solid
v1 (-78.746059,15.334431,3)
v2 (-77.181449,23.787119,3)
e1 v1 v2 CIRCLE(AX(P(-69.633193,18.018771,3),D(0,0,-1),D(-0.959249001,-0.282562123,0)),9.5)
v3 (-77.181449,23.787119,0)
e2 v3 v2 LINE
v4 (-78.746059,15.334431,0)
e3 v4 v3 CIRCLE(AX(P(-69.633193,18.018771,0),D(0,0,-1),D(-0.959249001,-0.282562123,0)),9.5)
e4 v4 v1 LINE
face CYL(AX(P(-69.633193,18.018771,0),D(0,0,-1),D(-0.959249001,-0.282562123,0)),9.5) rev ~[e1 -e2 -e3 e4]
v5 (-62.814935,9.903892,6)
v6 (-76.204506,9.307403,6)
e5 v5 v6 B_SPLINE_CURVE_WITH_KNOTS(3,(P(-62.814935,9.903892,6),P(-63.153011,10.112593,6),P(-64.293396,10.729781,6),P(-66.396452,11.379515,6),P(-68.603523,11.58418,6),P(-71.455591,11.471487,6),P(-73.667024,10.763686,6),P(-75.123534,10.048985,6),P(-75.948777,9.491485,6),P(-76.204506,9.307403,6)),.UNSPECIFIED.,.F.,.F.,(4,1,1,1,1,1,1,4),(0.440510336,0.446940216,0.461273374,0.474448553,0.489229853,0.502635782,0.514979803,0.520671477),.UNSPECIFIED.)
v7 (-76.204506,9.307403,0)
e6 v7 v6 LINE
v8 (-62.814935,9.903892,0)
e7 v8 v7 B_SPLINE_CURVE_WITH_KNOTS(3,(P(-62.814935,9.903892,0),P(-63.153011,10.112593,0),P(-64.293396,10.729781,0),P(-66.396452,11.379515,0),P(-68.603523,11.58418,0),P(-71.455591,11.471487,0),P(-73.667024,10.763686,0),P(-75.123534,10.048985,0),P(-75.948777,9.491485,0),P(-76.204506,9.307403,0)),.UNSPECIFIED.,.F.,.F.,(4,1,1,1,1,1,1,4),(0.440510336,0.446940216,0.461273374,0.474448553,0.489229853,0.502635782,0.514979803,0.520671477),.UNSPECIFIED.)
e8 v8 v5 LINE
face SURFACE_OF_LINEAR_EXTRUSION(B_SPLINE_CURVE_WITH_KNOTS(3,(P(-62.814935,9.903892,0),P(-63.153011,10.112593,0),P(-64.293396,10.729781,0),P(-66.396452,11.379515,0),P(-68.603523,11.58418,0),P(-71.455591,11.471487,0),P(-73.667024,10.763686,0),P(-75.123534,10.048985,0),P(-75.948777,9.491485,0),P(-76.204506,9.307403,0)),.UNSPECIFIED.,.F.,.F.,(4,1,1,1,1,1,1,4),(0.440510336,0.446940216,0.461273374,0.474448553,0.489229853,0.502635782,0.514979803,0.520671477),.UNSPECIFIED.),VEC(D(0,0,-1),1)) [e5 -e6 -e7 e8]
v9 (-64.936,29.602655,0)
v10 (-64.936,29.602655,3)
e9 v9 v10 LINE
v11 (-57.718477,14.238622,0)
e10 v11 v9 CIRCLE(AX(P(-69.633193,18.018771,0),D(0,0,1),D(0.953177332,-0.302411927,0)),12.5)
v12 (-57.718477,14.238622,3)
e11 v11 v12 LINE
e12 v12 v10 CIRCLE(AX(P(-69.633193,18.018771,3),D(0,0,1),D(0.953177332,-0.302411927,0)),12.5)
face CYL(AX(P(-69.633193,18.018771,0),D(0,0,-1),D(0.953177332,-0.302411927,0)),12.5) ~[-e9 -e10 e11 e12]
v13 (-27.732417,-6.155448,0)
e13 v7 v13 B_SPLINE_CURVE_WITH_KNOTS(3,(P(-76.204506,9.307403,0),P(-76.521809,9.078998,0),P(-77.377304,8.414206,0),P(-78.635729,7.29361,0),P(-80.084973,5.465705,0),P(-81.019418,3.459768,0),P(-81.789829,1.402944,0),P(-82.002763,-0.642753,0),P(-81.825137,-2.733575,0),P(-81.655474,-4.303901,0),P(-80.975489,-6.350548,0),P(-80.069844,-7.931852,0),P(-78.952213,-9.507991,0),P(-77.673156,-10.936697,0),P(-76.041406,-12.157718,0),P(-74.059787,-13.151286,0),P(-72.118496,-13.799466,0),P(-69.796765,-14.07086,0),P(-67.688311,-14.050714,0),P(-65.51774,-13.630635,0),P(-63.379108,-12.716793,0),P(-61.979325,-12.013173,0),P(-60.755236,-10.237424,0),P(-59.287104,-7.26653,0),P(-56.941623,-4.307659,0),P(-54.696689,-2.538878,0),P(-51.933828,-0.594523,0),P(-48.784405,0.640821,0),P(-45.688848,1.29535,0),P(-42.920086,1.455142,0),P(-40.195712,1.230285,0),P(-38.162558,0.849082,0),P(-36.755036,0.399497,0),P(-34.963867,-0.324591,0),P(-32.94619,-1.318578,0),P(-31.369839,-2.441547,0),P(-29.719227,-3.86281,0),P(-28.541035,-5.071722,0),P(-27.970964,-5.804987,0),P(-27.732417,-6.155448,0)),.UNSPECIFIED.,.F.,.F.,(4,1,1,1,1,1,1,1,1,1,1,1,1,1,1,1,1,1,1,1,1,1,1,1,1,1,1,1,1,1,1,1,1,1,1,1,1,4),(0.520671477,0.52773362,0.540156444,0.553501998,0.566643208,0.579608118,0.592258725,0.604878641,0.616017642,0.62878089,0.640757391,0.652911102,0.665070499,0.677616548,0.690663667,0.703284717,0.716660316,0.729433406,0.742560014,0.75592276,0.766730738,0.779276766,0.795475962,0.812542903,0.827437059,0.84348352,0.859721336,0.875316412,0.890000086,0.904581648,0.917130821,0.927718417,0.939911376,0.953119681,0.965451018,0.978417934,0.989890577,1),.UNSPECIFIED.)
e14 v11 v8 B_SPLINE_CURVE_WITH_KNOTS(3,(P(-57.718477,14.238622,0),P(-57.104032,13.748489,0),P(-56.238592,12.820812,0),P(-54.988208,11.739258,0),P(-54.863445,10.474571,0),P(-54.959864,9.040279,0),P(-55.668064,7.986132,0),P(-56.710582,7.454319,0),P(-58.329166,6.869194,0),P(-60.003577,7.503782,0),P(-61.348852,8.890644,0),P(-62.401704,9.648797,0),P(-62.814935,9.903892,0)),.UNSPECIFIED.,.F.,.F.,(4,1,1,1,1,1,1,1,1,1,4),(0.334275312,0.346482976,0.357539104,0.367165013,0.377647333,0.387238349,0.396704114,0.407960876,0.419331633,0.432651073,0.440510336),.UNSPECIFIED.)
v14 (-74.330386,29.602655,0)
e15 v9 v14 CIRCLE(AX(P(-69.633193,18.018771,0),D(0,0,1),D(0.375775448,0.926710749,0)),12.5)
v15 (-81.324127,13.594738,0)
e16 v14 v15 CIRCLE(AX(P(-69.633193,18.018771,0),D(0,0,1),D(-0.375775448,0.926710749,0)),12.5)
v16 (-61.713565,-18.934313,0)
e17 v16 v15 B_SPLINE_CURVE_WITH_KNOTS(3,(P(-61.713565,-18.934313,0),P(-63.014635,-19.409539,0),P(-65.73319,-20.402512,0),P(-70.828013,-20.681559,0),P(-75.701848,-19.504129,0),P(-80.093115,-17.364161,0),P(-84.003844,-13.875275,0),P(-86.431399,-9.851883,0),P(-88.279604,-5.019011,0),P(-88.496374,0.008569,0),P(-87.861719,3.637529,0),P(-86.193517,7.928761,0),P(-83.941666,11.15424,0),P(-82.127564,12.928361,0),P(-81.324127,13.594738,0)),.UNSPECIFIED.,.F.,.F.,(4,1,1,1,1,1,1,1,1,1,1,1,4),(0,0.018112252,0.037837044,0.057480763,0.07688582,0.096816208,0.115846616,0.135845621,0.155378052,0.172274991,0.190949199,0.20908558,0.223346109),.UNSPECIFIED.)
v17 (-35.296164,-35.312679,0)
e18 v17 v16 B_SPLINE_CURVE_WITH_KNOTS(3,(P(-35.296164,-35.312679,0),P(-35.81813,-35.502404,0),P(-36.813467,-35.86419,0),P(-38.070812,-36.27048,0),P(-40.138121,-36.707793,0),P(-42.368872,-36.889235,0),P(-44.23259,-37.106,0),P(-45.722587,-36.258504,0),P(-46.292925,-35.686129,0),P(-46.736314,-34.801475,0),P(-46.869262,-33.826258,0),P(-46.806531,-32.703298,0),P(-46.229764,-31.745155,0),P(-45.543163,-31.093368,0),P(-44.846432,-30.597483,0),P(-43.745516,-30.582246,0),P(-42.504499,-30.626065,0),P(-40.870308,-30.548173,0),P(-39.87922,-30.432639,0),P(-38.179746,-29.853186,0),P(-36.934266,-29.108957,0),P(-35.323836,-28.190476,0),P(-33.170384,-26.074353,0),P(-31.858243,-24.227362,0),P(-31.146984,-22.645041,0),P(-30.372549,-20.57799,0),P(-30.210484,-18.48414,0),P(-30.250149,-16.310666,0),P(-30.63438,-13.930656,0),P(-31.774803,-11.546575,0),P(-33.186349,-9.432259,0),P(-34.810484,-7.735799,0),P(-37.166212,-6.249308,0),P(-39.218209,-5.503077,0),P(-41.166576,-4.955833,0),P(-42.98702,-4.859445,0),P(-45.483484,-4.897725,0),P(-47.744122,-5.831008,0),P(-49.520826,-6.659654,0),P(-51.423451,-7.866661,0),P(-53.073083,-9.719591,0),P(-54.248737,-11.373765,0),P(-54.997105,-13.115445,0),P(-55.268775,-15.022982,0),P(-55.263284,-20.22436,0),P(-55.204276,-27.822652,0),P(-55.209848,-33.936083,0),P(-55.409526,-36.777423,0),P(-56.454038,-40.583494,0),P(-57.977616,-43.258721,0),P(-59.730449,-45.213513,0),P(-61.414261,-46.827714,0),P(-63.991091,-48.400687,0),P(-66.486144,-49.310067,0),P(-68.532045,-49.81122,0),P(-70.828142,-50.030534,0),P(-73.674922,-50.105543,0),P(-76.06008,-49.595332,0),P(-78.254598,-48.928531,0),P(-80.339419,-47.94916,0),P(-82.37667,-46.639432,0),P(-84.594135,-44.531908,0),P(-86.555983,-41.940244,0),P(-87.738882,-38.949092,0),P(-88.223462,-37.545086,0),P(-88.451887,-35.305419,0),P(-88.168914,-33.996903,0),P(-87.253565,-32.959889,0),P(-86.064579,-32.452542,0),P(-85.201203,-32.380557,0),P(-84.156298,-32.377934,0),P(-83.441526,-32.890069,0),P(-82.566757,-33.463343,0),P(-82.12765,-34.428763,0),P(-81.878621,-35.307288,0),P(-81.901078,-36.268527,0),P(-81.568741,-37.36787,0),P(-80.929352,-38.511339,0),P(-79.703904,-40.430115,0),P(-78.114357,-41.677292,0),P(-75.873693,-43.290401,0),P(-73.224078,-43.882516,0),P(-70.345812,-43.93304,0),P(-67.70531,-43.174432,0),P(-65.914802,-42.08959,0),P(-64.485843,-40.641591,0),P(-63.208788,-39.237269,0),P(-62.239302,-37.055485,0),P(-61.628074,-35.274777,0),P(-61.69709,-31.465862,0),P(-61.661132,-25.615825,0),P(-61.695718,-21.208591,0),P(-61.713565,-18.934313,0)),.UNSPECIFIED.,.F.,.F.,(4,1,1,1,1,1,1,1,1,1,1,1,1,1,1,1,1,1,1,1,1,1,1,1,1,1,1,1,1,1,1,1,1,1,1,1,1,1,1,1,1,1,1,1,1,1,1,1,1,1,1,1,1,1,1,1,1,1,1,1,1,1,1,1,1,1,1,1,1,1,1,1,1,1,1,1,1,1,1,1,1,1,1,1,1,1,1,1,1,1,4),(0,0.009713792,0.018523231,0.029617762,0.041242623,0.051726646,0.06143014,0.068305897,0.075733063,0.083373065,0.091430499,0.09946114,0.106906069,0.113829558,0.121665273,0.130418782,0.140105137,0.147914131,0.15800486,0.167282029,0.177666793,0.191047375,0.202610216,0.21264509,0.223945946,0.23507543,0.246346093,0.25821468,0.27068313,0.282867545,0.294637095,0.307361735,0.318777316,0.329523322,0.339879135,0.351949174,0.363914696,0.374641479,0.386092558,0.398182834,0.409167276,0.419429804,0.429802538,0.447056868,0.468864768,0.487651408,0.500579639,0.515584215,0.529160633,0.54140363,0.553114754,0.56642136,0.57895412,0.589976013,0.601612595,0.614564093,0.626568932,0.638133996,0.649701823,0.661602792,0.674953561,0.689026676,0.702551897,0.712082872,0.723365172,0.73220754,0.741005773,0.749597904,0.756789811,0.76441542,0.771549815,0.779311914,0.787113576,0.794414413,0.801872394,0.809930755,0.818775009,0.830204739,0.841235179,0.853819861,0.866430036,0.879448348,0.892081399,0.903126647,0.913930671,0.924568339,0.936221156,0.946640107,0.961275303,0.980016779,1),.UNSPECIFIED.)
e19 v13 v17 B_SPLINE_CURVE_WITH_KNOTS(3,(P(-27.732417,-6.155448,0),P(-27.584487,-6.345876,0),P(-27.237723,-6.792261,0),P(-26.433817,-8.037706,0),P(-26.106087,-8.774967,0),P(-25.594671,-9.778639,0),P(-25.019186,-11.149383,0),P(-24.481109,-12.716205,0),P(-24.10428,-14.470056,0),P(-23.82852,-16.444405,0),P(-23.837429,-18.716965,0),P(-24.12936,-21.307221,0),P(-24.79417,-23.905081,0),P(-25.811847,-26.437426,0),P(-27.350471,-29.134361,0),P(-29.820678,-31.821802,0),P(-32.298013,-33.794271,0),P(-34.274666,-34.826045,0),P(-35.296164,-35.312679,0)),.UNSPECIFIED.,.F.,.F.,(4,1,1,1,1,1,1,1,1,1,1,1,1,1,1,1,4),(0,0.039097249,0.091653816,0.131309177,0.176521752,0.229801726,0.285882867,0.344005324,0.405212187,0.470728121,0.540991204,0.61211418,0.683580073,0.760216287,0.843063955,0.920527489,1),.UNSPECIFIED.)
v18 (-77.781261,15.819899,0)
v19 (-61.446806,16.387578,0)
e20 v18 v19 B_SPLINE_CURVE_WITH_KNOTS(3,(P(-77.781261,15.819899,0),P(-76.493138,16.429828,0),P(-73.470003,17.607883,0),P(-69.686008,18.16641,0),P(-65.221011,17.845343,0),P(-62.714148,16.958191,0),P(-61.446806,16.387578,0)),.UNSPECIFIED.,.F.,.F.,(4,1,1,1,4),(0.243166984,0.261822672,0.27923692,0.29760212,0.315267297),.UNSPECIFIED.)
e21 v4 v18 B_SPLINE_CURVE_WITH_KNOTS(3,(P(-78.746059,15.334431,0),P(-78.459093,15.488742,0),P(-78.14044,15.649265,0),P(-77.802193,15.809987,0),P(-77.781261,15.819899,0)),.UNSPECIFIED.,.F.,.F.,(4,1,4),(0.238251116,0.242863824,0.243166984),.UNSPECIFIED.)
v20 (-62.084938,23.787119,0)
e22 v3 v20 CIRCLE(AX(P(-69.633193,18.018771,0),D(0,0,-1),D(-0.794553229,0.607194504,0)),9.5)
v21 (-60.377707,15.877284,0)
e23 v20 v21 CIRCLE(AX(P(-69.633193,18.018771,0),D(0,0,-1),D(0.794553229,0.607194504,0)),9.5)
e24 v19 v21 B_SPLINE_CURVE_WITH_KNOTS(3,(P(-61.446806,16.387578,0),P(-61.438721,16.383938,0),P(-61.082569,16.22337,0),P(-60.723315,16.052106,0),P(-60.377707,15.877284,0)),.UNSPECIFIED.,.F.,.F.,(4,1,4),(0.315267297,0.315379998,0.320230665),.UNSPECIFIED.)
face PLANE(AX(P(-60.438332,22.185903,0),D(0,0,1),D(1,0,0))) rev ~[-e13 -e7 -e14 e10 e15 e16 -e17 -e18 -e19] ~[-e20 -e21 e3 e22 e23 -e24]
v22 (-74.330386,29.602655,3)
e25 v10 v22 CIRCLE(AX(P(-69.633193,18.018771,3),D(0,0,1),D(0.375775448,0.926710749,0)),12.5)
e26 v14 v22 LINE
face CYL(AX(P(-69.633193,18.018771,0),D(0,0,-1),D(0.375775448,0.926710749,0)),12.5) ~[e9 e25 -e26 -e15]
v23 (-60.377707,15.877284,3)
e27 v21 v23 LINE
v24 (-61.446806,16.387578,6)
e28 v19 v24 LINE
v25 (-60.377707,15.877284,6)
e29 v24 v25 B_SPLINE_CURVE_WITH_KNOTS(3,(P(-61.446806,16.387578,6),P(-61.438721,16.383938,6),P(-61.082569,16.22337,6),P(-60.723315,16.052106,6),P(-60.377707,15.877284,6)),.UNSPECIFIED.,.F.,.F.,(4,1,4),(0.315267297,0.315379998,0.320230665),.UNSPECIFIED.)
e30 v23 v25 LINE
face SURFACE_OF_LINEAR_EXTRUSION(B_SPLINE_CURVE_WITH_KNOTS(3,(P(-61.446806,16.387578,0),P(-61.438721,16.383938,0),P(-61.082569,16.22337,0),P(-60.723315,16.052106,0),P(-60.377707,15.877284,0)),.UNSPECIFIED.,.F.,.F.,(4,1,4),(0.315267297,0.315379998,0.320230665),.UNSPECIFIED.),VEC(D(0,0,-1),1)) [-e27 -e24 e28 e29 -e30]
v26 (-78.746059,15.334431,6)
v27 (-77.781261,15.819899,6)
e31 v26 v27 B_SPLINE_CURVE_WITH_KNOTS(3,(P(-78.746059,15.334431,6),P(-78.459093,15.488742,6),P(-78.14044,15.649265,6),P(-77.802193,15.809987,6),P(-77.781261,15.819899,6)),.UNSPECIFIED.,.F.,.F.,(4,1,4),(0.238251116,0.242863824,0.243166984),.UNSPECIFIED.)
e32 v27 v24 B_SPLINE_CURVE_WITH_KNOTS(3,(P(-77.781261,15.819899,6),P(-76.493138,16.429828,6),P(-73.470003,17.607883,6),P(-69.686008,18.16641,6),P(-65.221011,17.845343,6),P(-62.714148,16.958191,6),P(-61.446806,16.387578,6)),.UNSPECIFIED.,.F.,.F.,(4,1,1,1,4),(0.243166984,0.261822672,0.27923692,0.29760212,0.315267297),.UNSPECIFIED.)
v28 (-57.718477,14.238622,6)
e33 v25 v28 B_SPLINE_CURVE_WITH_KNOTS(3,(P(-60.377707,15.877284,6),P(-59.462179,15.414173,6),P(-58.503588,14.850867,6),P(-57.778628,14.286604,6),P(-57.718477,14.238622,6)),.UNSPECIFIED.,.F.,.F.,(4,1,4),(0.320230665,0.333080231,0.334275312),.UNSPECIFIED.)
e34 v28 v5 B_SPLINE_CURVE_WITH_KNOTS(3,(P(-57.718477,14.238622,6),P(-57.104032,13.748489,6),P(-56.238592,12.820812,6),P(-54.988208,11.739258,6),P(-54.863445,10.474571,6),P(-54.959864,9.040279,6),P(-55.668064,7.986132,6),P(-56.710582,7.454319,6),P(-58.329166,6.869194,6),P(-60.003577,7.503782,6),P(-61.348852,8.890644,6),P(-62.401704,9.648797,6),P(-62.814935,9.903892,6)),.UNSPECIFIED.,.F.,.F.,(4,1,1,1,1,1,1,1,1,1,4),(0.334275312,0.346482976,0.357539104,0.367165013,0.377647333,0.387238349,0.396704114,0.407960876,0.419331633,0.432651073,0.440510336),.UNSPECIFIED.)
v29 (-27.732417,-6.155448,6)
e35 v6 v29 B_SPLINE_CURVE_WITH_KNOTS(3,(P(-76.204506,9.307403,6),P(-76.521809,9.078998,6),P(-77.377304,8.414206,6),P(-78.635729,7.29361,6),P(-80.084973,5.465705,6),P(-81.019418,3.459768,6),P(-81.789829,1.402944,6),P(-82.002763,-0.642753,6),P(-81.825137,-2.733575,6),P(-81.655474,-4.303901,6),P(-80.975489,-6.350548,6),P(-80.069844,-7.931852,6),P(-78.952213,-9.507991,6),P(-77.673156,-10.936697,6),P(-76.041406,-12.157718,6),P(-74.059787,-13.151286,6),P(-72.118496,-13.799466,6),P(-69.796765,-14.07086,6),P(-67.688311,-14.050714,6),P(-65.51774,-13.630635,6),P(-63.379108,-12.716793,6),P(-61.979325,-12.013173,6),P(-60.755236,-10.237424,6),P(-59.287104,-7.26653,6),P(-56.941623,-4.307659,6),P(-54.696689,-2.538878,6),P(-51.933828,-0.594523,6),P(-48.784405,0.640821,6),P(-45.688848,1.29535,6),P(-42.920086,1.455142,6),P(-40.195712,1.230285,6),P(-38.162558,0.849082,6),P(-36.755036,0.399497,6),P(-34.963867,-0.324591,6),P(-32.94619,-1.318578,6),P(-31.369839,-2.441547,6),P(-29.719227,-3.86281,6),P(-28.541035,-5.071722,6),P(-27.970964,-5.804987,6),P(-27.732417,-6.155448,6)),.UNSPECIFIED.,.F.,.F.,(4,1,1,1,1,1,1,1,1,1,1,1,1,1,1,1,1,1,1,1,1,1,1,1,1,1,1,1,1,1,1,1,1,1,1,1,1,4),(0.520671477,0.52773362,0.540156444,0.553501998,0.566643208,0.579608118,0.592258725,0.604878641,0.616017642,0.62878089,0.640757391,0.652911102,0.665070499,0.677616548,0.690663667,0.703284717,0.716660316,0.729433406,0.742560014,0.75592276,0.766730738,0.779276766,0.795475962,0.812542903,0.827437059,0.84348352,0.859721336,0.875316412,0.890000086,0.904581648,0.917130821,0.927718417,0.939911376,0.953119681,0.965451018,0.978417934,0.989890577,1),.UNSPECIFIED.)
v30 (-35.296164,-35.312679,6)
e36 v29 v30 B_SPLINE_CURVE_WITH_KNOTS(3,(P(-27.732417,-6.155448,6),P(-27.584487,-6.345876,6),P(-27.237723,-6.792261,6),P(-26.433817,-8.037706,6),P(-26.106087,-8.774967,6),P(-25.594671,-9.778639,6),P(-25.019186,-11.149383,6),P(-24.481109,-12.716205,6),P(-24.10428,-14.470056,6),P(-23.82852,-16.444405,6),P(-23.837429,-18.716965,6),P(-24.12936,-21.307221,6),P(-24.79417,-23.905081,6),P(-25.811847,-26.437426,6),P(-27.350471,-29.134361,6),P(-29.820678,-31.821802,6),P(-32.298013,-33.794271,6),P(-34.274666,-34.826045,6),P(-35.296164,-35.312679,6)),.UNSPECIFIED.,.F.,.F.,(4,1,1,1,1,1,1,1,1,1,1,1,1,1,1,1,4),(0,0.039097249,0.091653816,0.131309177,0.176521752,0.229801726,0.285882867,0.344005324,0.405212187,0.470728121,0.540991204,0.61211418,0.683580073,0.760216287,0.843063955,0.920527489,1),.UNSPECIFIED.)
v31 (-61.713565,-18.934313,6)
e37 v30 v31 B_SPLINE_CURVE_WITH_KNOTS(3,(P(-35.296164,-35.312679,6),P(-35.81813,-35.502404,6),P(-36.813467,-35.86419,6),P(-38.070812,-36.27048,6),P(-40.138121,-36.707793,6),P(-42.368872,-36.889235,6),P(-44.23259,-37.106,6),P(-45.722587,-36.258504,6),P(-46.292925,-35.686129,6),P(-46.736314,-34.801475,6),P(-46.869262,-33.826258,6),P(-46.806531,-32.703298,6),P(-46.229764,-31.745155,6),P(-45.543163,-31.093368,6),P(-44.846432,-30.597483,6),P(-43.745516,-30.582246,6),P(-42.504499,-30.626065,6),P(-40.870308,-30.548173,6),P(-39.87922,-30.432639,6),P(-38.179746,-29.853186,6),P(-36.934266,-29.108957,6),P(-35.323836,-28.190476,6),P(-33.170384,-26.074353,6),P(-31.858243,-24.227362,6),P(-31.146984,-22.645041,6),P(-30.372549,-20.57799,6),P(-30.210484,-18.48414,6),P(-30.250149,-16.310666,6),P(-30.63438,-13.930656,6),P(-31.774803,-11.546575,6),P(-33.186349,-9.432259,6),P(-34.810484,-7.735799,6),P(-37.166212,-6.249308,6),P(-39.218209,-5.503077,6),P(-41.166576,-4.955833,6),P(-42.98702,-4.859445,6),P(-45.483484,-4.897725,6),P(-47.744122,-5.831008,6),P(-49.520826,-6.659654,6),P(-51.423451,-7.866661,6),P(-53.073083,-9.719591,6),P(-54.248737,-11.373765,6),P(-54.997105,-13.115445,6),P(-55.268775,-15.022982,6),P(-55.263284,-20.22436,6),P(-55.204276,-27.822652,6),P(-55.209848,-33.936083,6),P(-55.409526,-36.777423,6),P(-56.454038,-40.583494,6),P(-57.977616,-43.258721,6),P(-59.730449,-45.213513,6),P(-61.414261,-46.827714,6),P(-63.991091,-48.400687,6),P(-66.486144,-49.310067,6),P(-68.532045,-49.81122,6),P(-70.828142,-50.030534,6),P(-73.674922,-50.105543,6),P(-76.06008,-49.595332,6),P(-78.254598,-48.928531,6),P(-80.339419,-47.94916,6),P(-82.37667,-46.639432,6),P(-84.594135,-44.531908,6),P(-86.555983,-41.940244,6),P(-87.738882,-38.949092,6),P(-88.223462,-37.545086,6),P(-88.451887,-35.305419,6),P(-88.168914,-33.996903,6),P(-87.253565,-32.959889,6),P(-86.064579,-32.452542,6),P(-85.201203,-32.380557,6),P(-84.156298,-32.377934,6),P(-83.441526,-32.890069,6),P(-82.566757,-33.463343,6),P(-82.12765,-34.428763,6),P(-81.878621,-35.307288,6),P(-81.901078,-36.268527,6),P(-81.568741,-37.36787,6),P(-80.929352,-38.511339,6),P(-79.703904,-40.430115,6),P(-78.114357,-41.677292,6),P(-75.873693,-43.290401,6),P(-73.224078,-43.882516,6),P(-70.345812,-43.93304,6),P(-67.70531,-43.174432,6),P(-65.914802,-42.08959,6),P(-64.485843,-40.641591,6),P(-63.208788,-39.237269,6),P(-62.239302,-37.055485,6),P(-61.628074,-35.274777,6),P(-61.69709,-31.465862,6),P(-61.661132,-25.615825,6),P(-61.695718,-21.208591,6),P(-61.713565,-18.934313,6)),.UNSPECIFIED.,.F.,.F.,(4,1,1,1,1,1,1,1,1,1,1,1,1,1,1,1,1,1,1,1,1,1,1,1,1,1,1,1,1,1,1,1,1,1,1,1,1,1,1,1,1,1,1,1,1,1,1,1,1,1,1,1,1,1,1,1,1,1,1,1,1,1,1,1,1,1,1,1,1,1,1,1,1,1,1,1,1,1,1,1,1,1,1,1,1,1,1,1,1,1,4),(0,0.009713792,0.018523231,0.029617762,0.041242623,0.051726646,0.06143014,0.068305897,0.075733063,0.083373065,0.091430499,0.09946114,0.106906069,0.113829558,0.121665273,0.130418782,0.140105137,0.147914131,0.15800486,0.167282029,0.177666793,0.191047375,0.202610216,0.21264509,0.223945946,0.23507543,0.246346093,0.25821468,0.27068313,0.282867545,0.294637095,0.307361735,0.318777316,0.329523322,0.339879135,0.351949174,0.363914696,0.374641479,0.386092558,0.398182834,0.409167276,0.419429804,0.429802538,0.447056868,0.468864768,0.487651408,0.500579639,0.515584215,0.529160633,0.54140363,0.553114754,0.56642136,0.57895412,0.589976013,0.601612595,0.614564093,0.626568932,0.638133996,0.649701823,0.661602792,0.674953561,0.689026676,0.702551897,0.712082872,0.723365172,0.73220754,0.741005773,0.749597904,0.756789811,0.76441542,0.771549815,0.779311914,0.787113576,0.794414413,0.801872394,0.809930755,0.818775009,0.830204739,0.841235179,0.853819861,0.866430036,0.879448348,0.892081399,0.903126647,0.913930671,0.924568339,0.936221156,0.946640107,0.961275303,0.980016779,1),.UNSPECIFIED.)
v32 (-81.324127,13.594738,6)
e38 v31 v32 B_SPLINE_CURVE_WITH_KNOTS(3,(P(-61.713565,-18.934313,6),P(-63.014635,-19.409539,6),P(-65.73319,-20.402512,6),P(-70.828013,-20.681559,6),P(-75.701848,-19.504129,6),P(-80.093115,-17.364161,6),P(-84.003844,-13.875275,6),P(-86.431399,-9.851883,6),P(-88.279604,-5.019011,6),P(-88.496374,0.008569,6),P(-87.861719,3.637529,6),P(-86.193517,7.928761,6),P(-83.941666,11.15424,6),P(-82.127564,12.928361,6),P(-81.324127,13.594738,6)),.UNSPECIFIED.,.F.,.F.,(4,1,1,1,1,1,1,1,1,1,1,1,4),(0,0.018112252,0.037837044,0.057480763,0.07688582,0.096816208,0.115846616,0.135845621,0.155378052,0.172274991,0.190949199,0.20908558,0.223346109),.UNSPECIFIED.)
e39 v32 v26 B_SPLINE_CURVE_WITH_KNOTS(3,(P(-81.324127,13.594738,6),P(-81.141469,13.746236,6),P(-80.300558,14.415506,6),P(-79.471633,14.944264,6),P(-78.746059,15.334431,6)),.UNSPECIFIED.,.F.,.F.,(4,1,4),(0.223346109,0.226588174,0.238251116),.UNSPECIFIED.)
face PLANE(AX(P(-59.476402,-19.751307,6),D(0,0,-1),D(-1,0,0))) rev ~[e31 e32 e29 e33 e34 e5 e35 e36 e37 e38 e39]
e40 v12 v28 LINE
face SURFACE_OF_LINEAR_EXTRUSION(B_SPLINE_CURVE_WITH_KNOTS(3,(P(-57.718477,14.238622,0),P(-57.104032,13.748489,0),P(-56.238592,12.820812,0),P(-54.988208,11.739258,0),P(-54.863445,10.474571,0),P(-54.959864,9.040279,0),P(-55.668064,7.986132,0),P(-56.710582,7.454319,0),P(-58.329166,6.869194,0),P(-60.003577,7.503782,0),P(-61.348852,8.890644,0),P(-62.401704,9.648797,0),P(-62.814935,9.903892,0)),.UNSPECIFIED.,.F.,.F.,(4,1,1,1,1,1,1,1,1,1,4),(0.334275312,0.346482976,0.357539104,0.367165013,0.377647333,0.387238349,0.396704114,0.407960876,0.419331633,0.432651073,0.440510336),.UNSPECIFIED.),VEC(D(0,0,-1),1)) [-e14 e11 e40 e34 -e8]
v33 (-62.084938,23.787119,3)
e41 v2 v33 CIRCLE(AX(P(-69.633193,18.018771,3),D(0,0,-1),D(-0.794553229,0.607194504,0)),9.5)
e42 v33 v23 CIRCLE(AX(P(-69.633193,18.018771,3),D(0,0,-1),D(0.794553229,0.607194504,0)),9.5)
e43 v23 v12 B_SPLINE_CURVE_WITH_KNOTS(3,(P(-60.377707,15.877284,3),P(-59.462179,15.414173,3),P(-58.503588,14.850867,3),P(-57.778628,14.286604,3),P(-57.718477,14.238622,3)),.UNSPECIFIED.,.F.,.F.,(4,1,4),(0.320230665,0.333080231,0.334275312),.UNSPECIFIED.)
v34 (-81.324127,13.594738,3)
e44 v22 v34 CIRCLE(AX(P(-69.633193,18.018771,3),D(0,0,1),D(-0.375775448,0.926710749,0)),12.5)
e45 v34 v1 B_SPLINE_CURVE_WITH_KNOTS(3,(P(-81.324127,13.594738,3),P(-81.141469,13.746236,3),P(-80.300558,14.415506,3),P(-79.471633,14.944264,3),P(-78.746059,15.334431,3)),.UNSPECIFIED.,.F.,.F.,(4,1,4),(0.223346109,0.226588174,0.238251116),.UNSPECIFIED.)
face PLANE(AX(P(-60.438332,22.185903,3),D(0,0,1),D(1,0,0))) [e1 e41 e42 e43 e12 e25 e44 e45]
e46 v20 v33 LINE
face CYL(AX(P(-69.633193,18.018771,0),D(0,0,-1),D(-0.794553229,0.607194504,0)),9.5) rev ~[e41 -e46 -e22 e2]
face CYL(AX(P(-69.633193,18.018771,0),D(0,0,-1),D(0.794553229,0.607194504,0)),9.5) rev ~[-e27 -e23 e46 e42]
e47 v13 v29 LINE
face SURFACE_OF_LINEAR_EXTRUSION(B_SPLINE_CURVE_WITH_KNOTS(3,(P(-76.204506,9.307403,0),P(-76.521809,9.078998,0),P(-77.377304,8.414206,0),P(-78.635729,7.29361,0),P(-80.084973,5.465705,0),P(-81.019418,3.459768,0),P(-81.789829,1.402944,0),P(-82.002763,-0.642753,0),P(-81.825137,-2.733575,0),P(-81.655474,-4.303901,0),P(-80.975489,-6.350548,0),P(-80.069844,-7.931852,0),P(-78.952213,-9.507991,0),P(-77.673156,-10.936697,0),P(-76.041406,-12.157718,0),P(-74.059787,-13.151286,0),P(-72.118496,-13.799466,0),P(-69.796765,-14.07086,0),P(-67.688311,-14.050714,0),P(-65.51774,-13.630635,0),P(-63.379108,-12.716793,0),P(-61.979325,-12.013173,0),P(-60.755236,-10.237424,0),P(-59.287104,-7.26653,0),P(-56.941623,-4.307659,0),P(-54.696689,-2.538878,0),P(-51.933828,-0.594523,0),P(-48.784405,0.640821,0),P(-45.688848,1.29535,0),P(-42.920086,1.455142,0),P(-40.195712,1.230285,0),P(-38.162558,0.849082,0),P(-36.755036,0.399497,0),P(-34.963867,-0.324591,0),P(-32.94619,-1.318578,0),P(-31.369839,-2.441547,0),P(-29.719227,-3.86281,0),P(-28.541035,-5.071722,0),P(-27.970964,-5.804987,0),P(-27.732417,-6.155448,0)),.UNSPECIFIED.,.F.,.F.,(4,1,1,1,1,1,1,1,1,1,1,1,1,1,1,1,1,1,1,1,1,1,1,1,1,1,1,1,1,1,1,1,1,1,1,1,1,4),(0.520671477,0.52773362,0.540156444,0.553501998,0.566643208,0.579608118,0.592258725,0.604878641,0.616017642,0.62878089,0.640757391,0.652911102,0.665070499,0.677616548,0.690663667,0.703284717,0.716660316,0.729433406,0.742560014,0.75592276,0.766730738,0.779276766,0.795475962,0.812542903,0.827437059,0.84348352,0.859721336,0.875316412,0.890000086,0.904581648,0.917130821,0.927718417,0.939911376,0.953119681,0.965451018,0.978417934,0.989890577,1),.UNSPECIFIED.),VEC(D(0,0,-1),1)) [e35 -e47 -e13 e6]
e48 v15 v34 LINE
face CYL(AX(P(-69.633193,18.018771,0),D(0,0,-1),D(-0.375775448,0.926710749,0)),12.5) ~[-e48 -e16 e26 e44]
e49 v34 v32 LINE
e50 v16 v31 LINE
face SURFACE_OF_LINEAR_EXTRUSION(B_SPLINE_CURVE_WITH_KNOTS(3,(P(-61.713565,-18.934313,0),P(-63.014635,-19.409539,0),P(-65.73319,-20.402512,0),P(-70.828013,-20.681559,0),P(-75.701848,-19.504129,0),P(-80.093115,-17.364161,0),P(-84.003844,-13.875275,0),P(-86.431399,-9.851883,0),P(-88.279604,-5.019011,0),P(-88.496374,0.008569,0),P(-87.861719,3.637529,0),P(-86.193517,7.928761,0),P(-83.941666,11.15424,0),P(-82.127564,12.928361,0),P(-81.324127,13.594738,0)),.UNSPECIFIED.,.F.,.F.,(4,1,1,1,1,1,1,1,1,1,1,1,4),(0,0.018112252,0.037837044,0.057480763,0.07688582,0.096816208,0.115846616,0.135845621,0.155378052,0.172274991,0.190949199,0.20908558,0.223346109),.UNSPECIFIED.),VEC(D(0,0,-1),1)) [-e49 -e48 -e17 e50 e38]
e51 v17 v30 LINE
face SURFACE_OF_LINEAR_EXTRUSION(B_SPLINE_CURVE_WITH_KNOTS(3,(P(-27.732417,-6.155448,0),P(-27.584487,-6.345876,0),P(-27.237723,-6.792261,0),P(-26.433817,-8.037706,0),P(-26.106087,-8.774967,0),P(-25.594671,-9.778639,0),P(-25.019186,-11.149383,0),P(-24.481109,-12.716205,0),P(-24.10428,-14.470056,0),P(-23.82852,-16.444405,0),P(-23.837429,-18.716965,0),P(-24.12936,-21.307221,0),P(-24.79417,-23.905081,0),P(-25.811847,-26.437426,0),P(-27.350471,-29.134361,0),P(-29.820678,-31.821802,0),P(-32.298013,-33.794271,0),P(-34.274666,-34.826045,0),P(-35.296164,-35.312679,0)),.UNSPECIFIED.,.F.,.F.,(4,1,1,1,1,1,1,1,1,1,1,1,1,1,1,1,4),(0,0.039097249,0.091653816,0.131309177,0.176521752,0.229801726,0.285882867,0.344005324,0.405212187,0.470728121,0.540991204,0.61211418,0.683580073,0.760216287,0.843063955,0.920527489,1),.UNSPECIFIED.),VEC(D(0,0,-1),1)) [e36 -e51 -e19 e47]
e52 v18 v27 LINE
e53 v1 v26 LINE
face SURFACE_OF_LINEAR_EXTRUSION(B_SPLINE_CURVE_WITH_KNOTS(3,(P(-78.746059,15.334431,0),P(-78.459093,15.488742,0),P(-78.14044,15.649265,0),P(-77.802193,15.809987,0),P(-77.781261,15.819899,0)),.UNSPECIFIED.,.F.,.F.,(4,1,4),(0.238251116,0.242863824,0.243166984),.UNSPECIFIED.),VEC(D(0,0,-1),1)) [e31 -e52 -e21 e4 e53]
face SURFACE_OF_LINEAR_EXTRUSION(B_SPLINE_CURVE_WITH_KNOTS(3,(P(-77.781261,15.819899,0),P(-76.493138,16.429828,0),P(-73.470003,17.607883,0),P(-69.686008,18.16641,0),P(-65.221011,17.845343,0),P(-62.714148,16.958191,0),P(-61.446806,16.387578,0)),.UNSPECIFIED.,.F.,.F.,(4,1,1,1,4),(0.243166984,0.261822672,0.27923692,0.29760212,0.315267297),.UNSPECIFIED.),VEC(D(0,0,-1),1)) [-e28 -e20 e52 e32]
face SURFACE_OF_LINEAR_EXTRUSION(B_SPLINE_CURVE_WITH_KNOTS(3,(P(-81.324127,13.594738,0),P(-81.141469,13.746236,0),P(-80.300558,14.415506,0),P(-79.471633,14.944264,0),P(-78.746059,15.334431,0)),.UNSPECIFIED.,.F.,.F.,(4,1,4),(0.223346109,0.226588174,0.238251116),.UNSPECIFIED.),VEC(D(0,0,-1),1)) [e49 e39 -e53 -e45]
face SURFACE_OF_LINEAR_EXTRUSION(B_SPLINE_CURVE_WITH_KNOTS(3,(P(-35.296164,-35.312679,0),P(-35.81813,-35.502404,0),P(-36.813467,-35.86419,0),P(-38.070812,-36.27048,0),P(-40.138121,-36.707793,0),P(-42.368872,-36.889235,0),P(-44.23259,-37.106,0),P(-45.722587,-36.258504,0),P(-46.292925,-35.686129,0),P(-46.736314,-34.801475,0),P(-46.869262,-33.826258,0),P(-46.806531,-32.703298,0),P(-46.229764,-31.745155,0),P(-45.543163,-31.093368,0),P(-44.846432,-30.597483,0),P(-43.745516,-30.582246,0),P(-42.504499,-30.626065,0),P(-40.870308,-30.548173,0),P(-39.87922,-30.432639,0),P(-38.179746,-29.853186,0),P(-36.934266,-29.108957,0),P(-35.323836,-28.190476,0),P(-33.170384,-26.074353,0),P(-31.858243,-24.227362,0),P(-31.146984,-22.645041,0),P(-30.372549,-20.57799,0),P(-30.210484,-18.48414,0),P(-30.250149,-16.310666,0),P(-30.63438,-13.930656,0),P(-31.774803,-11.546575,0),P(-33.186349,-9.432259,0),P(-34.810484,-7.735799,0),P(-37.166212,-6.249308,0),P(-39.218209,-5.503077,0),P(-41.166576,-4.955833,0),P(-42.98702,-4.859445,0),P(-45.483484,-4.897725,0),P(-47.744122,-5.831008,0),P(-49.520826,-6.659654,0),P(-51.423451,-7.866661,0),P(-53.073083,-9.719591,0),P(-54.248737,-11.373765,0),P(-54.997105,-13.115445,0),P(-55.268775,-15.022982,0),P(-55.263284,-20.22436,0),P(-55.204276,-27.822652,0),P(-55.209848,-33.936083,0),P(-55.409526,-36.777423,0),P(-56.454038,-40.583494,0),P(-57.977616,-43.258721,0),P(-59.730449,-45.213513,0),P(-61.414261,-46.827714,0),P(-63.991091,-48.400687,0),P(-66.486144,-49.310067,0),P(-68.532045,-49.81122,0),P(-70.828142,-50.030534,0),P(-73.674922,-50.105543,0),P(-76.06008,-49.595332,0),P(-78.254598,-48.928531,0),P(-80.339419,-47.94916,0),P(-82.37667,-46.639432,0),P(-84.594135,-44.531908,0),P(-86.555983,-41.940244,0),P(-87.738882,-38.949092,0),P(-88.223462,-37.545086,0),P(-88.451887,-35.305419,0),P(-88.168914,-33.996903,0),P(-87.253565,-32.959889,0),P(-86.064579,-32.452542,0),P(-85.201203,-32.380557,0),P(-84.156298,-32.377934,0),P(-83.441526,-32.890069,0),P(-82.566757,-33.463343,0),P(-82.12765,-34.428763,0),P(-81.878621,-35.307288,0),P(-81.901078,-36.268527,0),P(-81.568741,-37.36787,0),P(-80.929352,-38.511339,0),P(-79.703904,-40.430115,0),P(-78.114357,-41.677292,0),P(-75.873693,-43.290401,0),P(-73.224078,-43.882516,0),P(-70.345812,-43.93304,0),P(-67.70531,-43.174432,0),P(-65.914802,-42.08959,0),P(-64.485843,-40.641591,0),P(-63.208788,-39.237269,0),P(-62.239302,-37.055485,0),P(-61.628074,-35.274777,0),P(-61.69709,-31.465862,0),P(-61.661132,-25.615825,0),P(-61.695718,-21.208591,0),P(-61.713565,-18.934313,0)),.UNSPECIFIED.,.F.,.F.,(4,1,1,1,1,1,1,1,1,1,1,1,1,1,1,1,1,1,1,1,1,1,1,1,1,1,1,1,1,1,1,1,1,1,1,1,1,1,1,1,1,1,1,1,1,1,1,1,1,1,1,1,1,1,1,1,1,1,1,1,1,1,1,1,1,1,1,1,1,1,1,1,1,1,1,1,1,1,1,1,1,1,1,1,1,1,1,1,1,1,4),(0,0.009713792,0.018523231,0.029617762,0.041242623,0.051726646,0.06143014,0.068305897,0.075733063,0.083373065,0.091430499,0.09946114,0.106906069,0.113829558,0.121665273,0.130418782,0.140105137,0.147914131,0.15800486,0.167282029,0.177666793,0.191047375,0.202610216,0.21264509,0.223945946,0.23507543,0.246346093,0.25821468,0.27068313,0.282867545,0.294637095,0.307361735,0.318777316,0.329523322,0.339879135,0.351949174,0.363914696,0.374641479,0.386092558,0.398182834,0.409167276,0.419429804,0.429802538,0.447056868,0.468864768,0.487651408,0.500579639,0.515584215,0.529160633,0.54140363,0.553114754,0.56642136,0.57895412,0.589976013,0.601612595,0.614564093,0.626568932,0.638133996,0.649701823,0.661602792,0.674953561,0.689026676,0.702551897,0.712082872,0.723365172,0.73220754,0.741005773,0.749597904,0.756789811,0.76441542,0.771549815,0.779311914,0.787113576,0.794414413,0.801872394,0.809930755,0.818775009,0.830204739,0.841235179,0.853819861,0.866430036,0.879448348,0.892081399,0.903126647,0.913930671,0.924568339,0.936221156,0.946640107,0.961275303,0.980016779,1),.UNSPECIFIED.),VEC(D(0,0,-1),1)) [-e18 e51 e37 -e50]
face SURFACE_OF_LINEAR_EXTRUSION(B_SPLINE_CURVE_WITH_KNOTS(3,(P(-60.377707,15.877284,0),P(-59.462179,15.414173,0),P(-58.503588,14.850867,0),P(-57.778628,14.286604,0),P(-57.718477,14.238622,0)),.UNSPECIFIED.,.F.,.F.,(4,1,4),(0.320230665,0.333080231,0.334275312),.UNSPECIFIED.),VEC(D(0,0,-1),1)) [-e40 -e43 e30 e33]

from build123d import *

# Parameters (mm, degrees)
F1_DEPTH = 6
F2_DEPTH = 3


with BuildPart() as f1:
    # F0 (on Top) → F1 (new body)
    with BuildSketch(Plane.XY):
        with BuildLine():
            add(Edge.make_bspline(
                [(-61.713565141, -18.9343132079), (-63.0146348838, -19.4095390469), (-65.733189771, -20.4025123556), (-70.8280130497, -20.6815591765), (-75.7018481976, -19.5041294338), (-80.0931153376, -17.3641610679), (-84.0038443733, -13.8752753533), (-86.4313989815, -9.8518831116), (-88.2796036438, -5.0190108695), (-88.4963736266, 0.0085689786), (-87.8617186152, 3.6375292768), (-86.1935172065, 7.9287613179), (-83.9416658783, 11.1542399806), (-82.1275636618, 12.9283614758), (-81.3241270743, 13.5947379823)],
                knots=[0, 0, 0, 0, 0.0181122524, 0.0378370444, 0.0574807634, 0.0768858202, 0.0968162077, 0.1158466157, 0.1358456208, 0.1553780521, 0.1722749914, 0.190949199, 0.2090855796, 0.2233461087, 0.2233461087, 0.2233461087, 0.2233461087], degree=3))
            add(Edge.make_bspline(
                [(-35.296164453, -35.3126786649), (-35.8181301783, -35.5024037361), (-36.8134666802, -35.8641904962), (-38.0708117456, -36.270480159), (-40.138121174, -36.7077930279), (-42.3688721513, -36.8892351142), (-44.2325900627, -37.1059998289), (-45.7225874453, -36.2585038344), (-46.2929253284, -35.686129434), (-46.7363136163, -34.8014748443), (-46.8692619716, -33.8262575164), (-46.8065307463, -32.7032975926), (-46.2297636494, -31.7451552895), (-45.5431628055, -31.0933682437), (-44.8464319505, -30.5974831217), (-43.7455158564, -30.5822460272), (-42.5044985041, -30.6260654275), (-40.8703078904, -30.5481728825), (-39.8792195184, -30.4326386682), (-38.1797456225, -29.8531864623), (-36.9342661804, -29.1089567426), (-35.3238356448, -28.1904757097), (-33.170383713, -26.07435277), (-31.8582431136, -24.2273615637), (-31.1469842445, -22.6450405096), (-30.3725491148, -20.5779895244), (-30.2104838527, -18.4841397494), (-30.2501485523, -16.3106662094), (-30.6343803225, -13.9306564773), (-31.7748028839, -11.5465745257), (-33.186348835, -9.4322593089), (-34.8104844807, -7.735799033), (-37.1662119159, -6.2493083282), (-39.2182087251, -5.5030771293), (-41.166575858, -4.9558334521), (-42.9870195119, -4.859445306), (-45.4834836068, -4.897725137), (-47.7441223228, -5.8310077864), (-49.5208260418, -6.6596538791), (-51.4234507273, -7.8666605714), (-53.073082843, -9.7195908219), (-54.248737469, -11.3737650388), (-54.997105148, -13.1154447546), (-55.2687748261, -15.0229815759), (-55.2632841388, -20.2243601486), (-55.2042759513, -27.8226519462), (-55.2098481, -33.936082992), (-55.4095257107, -36.7774227554), (-56.4540380047, -40.5834941392), (-57.9776164972, -43.2587210437), (-59.7304487982, -45.2135126916), (-61.4142605805, -46.8277136166), (-63.9910912681, -48.4006874678), (-66.4861437494, -49.3100674413), (-68.5320453717, -49.8112197331), (-70.8281422598, -50.0305338543), (-73.6749221598, -50.1055434421), (-76.0600796044, -49.5953323554), (-78.2545980933, -48.9285309184), (-80.3394186289, -47.94916046), (-82.3766699977, -46.6394319711), (-84.5941350037, -44.5319080526), (-86.5559834995, -41.9402439855), (-87.7388820002, -38.9490920475), (-88.223461995, -37.5450863847), (-88.4518870314, -35.3054185599), (-88.1689144899, -33.996902953), (-87.2535647901, -32.9598891209), (-86.064578952, -32.4525417401), (-85.2012031694, -32.3805571825), (-84.1562979368, -32.3779337124), (-83.4415258264, -32.8900691989), (-82.5667565857, -33.4633434329), (-82.1276496152, -34.4287627257), (-81.8786209528, -35.3072880017), (-81.9010780662, -36.2685272173), (-81.5687414202, -37.3678700953), (-80.9293520817, -38.5113387996), (-79.7039044506, -40.4301147847), (-78.1143566296, -41.6772916231), (-75.8736928043, -43.2904010822), (-73.2240783852, -43.8825156923), (-70.3458122862, -43.9330397612), (-67.705309963, -43.1744317274), (-65.9148021977, -42.0895899621), (-64.485842596, -40.641590991), (-63.208787924, -39.2372686238), (-62.2393015406, -37.055484543), (-61.6280736511, -35.274776599), (-61.6970903399, -31.4658620455), (-61.6611319259, -25.6158249209), (-61.6957177272, -21.2085911438), (-61.713565141, -18.9343132079)],
                knots=[0, 0, 0, 0, 0.009713792, 0.018523231, 0.0296177616, 0.0412426231, 0.0517266457, 0.0614301399, 0.0683058968, 0.0757330625, 0.0833730649, 0.0914304993, 0.0994611402, 0.1069060689, 0.1138295582, 0.1216652726, 0.1304187819, 0.1401051374, 0.1479141307, 0.1580048595, 0.167282029, 0.177666793, 0.1910473747, 0.2026102156, 0.2126450904, 0.2239459464, 0.2350754304, 0.2463460933, 0.25821468, 0.2706831301, 0.2828675446, 0.2946370949, 0.3073617348, 0.3187773159, 0.3295233224, 0.3398791347, 0.351949174, 0.3639146961, 0.3746414794, 0.3860925584, 0.3981828339, 0.4091672758, 0.4194298037, 0.4298025383, 0.4470568677, 0.4688647684, 0.4876514078, 0.5005796386, 0.5155842151, 0.5291606332, 0.5414036299, 0.5531147539, 0.5664213601, 0.5789541197, 0.5899760135, 0.6016125951, 0.6145640928, 0.6265689317, 0.6381339955, 0.6497018232, 0.6616027915, 0.6749535609, 0.6890266756, 0.7025518969, 0.7120828724, 0.7233651725, 0.7322075404, 0.7410057732, 0.7495979039, 0.7567898106, 0.7644154198, 0.7715498147, 0.7793119137, 0.7871135756, 0.7944144135, 0.8018723941, 0.8099307547, 0.8187750089, 0.8302047394, 0.8412351794, 0.8538198609, 0.8664300361, 0.8794483478, 0.8920813992, 0.9031266466, 0.9139306713, 0.9245683387, 0.9362211561, 0.9466401074, 0.9612753029, 0.9800167795, 1, 1, 1, 1], degree=3))
            add(Edge.make_bspline(
                [(-27.7324169874, -6.1554475687), (-27.5844867603, -6.3458762594), (-27.2377225254, -6.792261427), (-26.4338168242, -8.0377056958), (-26.1060869313, -8.7749670887), (-25.5946712876, -9.7786394426), (-25.0191857066, -11.1493826388), (-24.4811088291, -12.7162052178), (-24.1042796832, -14.4700558507), (-23.8285203007, -16.4444047718), (-23.8374285511, -18.7169653805), (-24.1293597245, -21.3072211445), (-24.7941702457, -23.9050809113), (-25.8118469154, -26.437426106), (-27.3504709137, -29.134360782), (-29.8206777102, -31.8218017139), (-32.2980131944, -33.794270527), (-34.2746658689, -34.8260445424), (-35.296164453, -35.3126786649)],
                knots=[0, 0, 0, 0, 0.0390972492, 0.0916538163, 0.1313091765, 0.1765217524, 0.2298017258, 0.2858828672, 0.3440053241, 0.405212187, 0.4707281208, 0.5409912037, 0.6121141795, 0.6835800727, 0.7602162872, 0.8430639552, 0.9205274895, 1, 1, 1, 1], degree=3))
            add(Edge.make_bspline(
                [(-76.2045055318, 9.3074033652), (-76.5218089854, 9.078997831), (-77.3773037078, 8.4142063955), (-78.6357294598, 7.2936101698), (-80.0849730461, 5.4657053706), (-81.0194176934, 3.4597682952), (-81.7898287642, 1.4029441494), (-82.0027625241, -0.6427525487), (-81.8251370277, -2.7335750938), (-81.6554744679, -4.303900693), (-80.9754892278, -6.350547843), (-80.0698438514, -7.9318516488), (-78.9522131255, -9.5079907124), (-77.6731560568, -10.9366966539), (-76.0414056738, -12.1577177333), (-74.0597869131, -13.1512858627), (-72.1184957982, -13.7994659129), (-69.7967649674, -14.0708597413), (-67.6883106362, -14.0507143955), (-65.5177403296, -13.6306348883), (-63.3791081133, -12.7167926114), (-61.9793247667, -12.0131728726), (-60.7552359052, -10.2374244527), (-59.2871040846, -7.2665300949), (-56.9416232761, -4.307658848), (-54.696689077, -2.5388777859), (-51.9338279159, -0.5945232282), (-48.7844052072, 0.6408205746), (-45.6888475134, 1.2953502861), (-42.9200856358, 1.4551420776), (-40.1957117703, 1.2302845705), (-38.1625579987, 0.849082493), (-36.7550362077, 0.3994965104), (-34.9638669841, -0.3245907992), (-32.9461903075, -1.3185776658), (-31.3698386362, -2.4415469665), (-29.7192270514, -3.8628099901), (-28.5410352847, -5.0717218964), (-27.9709637085, -5.8049874455), (-27.7324169874, -6.1554475687)],
                knots=[0.5206714775, 0.5206714775, 0.5206714775, 0.5206714775, 0.5277336201, 0.5401564435, 0.5535019976, 0.5666432084, 0.5796081177, 0.5922587254, 0.6048786406, 0.6160176421, 0.6287808902, 0.640757391, 0.6529111024, 0.6650704989, 0.6776165481, 0.6906636666, 0.7032847174, 0.7166603162, 0.7294334063, 0.7425600138, 0.7559227599, 0.7667307379, 0.7792767658, 0.7954759623, 0.812542903, 0.8274370589, 0.8434835205, 0.8597213359, 0.8753164124, 0.8900000858, 0.9045816478, 0.9171308213, 0.9277184173, 0.939911376, 0.953119681, 0.9654510177, 0.9784179337, 0.9898905772, 1, 1, 1, 1], degree=3))
            add(Edge.make_bspline(
                [(-77.7812605681, 15.8198985313), (-77.7656474583, 15.6184901087), (-77.6996325647, 14.8752566882), (-77.5241918195, 13.6648439941), (-77.1656405971, 12.1481399625), (-76.7845693515, 10.7825369702), (-76.4108544823, 9.7727883648), (-76.2045055318, 9.3074033652)],
                knots=[0.2819929467, 0.2819929467, 0.2819929467, 0.2819929467, 0.2893287156, 0.308895452, 0.3282423501, 0.3474354454, 0.3648385459, 0.3648385459, 0.3648385459, 0.3648385459], degree=3))
            add(Edge.make_bspline(
                [(-78.7460588266, 15.3344307924), (-78.4590934981, 15.48874223), (-78.1404400268, 15.6492648888), (-77.8021928593, 15.8099870355), (-77.781260567, 15.8198985311)],
                knots=[0.2382511161, 0.2382511161, 0.2382511161, 0.2382511161, 0.2428638243, 0.2431669836, 0.2431669836, 0.2431669836, 0.2431669836], degree=3))
            add(Edge.make_bspline(
                [(-81.3241270743, 13.5947379823), (-81.1414694644, 13.7462356136), (-80.3005582565, 14.4155061862), (-79.4716325774, 14.9442640461), (-78.7460588266, 15.3344307924)],
                knots=[0.2233461087, 0.2233461087, 0.2233461087, 0.2233461087, 0.2265881743, 0.2382511161, 0.2382511161, 0.2382511161, 0.2382511161], degree=3))
        make_face()
        with BuildLine():
            add(Edge.make_bspline(
                [(-77.781260567, 15.8198985311), (-76.4931380597, 16.4298279359), (-73.4700030416, 17.6078829506), (-69.6860075919, 18.1664098839), (-65.2210105766, 17.8453428936), (-62.7141483006, 16.958191199), (-61.4468064845, 16.3875784567)],
                knots=[0.2431669836, 0.2431669836, 0.2431669836, 0.2431669836, 0.2618226723, 0.2792369205, 0.2976021198, 0.3152672972, 0.3152672972, 0.3152672972, 0.3152672972], degree=3))
            add(Edge.make_bspline(
                [(-77.7812605681, 15.8198985313), (-77.7656474583, 15.6184901087), (-77.6996325647, 14.8752566882), (-77.5241918195, 13.6648439941), (-77.1656405971, 12.1481399625), (-76.7845693515, 10.7825369702), (-76.4108544823, 9.7727883648), (-76.2045055318, 9.3074033652)],
                knots=[0.2819929467, 0.2819929467, 0.2819929467, 0.2819929467, 0.2893287156, 0.308895452, 0.3282423501, 0.3474354454, 0.3648385459, 0.3648385459, 0.3648385459, 0.3648385459], degree=3))
            add(Edge.make_bspline(
                [(-62.8149353652, 9.903892193), (-63.1530114927, 10.112592561), (-64.2933964119, 10.7297810382), (-66.3964523357, 11.3795145378), (-68.6035228421, 11.5841795565), (-71.455591251, 11.471487449), (-73.6670237686, 10.7636861036), (-75.1235336284, 10.0489853203), (-75.9487774766, 9.4914848884), (-76.2045055318, 9.3074033652)],
                knots=[0.4405103361, 0.4405103361, 0.4405103361, 0.4405103361, 0.4469402161, 0.4612733738, 0.4744485529, 0.4892298533, 0.5026357823, 0.5149798029, 0.5206714775, 0.5206714775, 0.5206714775, 0.5206714775], degree=3))
            add(Edge.make_bspline(
                [(-62.8149353652, 9.903892193), (-62.7099626128, 10.1750316236), (-62.4315811932, 10.9625624816), (-62.1007460311, 12.1481399625), (-61.7421948087, 13.6648439941), (-61.5402877605, 15.0578548019), (-61.4689217957, 16.0066300277), (-61.4468064841, 16.3875784568)],
                knots=[0.6191083522, 0.6191083522, 0.6191083522, 0.6191083522, 0.6291365538, 0.6483296491, 0.6676765471, 0.6872432836, 0.7015560561, 0.7015560561, 0.7015560561, 0.7015560561], degree=3))
        make_face()
        with BuildLine():
            add(Edge.make_bspline(
                [(-61.4468064845, 16.3875784567), (-61.4387210484, 16.3839380396), (-61.0825686276, 16.22337035), (-60.7233153737, 16.0521064438), (-60.377706703, 15.8772837247)],
                knots=[0.3152672972, 0.3152672972, 0.3152672972, 0.3152672972, 0.3153799981, 0.3202306654, 0.3202306654, 0.3202306654, 0.3202306654], degree=3))
            add(Edge.make_bspline(
                [(-62.8149353652, 9.903892193), (-62.7099626128, 10.1750316236), (-62.4315811932, 10.9625624816), (-62.1007460311, 12.1481399625), (-61.7421948087, 13.6648439941), (-61.5402877605, 15.0578548019), (-61.4689217957, 16.0066300277), (-61.4468064841, 16.3875784568)],
                knots=[0.6191083522, 0.6191083522, 0.6191083522, 0.6191083522, 0.6291365538, 0.6483296491, 0.6676765471, 0.6872432836, 0.7015560561, 0.7015560561, 0.7015560561, 0.7015560561], degree=3))
            add(Edge.make_bspline(
                [(-57.7184766628, 14.2386218759), (-57.1040316706, 13.7484886091), (-56.2385922947, 12.8208118517), (-54.9882083885, 11.7392577457), (-54.8634453308, 10.4745706289), (-54.9598637888, 9.0402785981), (-55.6680644185, 7.9861319672), (-56.710582305, 7.454319038), (-58.3291660915, 6.8691938499), (-60.0035771408, 7.5037817098), (-61.3488520287, 8.8906439946), (-62.4017038079, 9.6487970501), (-62.8149353652, 9.903892193)],
                knots=[0.3342753119, 0.3342753119, 0.3342753119, 0.3342753119, 0.3464829764, 0.3575391041, 0.367165013, 0.3776473327, 0.3872383492, 0.3967041143, 0.4079608764, 0.4193316329, 0.4326510727, 0.4405103361, 0.4405103361, 0.4405103361, 0.4405103361], degree=3))
            add(Edge.make_bspline(
                [(-60.377706703, 15.8772837247), (-59.4621787455, 15.4141729859), (-58.5035884124, 14.8508669845), (-57.7786283134, 14.2866039172), (-57.7184766628, 14.2386218759)],
                knots=[0.3202306654, 0.3202306654, 0.3202306654, 0.3202306654, 0.3330802314, 0.3342753119, 0.3342753119, 0.3342753119, 0.3342753119], degree=3))
        make_face()
    extrude(amount=F1_DEPTH)

    # F0 (on Top) → F2 (join)
    with BuildSketch(Plane.XY):
        with BuildLine():
            ThreePointArc((-57.7184766628, 14.2386218759), (-58.3193846113, 23.3336305696), (-64.9360002166, 29.6026553289))
            add(Edge.make_bspline(
                [(-62.0849376344, 23.7871187501), (-62.0925733957, 23.817134584), (-62.2244672864, 24.3327717422), (-62.5063607695, 25.3429873926), (-63.1472614927, 27.0385998339), (-64.014977683, 28.5182448026), (-64.6487121355, 29.2864815447), (-64.9336220661, 29.6000403925), (-64.9360002166, 29.6026553289)],
                knots=[0.798733913, 0.798733913, 0.798733913, 0.798733913, 0.799917792, 0.8191108873, 0.8401182393, 0.860681824, 0.8790023039, 0.8791565789, 0.8791565789, 0.8791565789, 0.8791565789], degree=3))
            ThreePointArc((-62.0849376343, 23.7871187501), (-60.3470309595, 20.0230635373), (-60.377706703, 15.8772837247))
            add(Edge.make_bspline(
                [(-60.377706703, 15.8772837247), (-59.4621787455, 15.4141729859), (-58.5035884124, 14.8508669845), (-57.7786283134, 14.2866039172), (-57.7184766628, 14.2386218759)],
                knots=[0.3202306654, 0.3202306654, 0.3202306654, 0.3202306654, 0.3330802314, 0.3342753119, 0.3342753119, 0.3342753119, 0.3342753119], degree=3))
        make_face()
        with BuildLine():
            ThreePointArc((-64.9360002166, 29.6026553289), (-69.6331933141, 30.518770963), (-74.3303864116, 29.6026553289))
            add(Edge.make_bspline(
                [(-74.3303864116, 29.6026553289), (-74.3327645621, 29.6000403925), (-74.6176744927, 29.2864815447), (-75.2514089452, 28.5182448026), (-76.1191251354, 27.0385998339), (-76.7600258586, 25.3429873926), (-77.0419193418, 24.3327717422), (-77.1738132324, 23.817134584), (-77.1814489938, 23.7871187501)],
                knots=[0.0974154203, 0.0974154203, 0.0974154203, 0.0974154203, 0.0975696953, 0.1158901752, 0.1364537599, 0.1574611118, 0.1766542072, 0.1778380862, 0.1778380862, 0.1778380862, 0.1778380862], degree=3))
            ThreePointArc((-77.1814489938, 23.7871187501), (-69.6331933141, 27.518770963), (-62.0849376343, 23.7871187501))
            add(Edge.make_bspline(
                [(-62.0849376344, 23.7871187501), (-62.0925733957, 23.817134584), (-62.2244672864, 24.3327717422), (-62.5063607695, 25.3429873926), (-63.1472614927, 27.0385998339), (-64.014977683, 28.5182448026), (-64.6487121355, 29.2864815447), (-64.9336220661, 29.6000403925), (-64.9360002166, 29.6026553289)],
                knots=[0.798733913, 0.798733913, 0.798733913, 0.798733913, 0.799917792, 0.8191108873, 0.8401182393, 0.860681824, 0.8790023039, 0.8791565789, 0.8791565789, 0.8791565789, 0.8791565789], degree=3))
        make_face()
        with BuildLine():
            ThreePointArc((-74.3303864116, 29.6026553289), (-81.0877133791, 23.0231660392), (-81.3241270743, 13.5947379823))
            add(Edge.make_bspline(
                [(-81.3241270743, 13.5947379823), (-81.1414694644, 13.7462356136), (-80.3005582565, 14.4155061862), (-79.4716325774, 14.9442640461), (-78.7460588266, 15.3344307924)],
                knots=[0.2233461087, 0.2233461087, 0.2233461087, 0.2233461087, 0.2265881743, 0.2382511161, 0.2382511161, 0.2382511161, 0.2382511161], degree=3))
            ThreePointArc((-78.7460588266, 15.3344307924), (-78.9745113834, 19.7478680473), (-77.1814489938, 23.7871187501))
            add(Edge.make_bspline(
                [(-74.3303864116, 29.6026553289), (-74.3327645621, 29.6000403925), (-74.6176744927, 29.2864815447), (-75.2514089452, 28.5182448026), (-76.1191251354, 27.0385998339), (-76.7600258586, 25.3429873926), (-77.0419193418, 24.3327717422), (-77.1738132324, 23.817134584), (-77.1814489938, 23.7871187501)],
                knots=[0.0974154203, 0.0974154203, 0.0974154203, 0.0974154203, 0.0975696953, 0.1158901752, 0.1364537599, 0.1574611118, 0.1766542072, 0.1778380862, 0.1778380862, 0.1778380862, 0.1778380862], degree=3))
        make_face()
    extrude(amount=F2_DEPTH)


solid = f1.part
